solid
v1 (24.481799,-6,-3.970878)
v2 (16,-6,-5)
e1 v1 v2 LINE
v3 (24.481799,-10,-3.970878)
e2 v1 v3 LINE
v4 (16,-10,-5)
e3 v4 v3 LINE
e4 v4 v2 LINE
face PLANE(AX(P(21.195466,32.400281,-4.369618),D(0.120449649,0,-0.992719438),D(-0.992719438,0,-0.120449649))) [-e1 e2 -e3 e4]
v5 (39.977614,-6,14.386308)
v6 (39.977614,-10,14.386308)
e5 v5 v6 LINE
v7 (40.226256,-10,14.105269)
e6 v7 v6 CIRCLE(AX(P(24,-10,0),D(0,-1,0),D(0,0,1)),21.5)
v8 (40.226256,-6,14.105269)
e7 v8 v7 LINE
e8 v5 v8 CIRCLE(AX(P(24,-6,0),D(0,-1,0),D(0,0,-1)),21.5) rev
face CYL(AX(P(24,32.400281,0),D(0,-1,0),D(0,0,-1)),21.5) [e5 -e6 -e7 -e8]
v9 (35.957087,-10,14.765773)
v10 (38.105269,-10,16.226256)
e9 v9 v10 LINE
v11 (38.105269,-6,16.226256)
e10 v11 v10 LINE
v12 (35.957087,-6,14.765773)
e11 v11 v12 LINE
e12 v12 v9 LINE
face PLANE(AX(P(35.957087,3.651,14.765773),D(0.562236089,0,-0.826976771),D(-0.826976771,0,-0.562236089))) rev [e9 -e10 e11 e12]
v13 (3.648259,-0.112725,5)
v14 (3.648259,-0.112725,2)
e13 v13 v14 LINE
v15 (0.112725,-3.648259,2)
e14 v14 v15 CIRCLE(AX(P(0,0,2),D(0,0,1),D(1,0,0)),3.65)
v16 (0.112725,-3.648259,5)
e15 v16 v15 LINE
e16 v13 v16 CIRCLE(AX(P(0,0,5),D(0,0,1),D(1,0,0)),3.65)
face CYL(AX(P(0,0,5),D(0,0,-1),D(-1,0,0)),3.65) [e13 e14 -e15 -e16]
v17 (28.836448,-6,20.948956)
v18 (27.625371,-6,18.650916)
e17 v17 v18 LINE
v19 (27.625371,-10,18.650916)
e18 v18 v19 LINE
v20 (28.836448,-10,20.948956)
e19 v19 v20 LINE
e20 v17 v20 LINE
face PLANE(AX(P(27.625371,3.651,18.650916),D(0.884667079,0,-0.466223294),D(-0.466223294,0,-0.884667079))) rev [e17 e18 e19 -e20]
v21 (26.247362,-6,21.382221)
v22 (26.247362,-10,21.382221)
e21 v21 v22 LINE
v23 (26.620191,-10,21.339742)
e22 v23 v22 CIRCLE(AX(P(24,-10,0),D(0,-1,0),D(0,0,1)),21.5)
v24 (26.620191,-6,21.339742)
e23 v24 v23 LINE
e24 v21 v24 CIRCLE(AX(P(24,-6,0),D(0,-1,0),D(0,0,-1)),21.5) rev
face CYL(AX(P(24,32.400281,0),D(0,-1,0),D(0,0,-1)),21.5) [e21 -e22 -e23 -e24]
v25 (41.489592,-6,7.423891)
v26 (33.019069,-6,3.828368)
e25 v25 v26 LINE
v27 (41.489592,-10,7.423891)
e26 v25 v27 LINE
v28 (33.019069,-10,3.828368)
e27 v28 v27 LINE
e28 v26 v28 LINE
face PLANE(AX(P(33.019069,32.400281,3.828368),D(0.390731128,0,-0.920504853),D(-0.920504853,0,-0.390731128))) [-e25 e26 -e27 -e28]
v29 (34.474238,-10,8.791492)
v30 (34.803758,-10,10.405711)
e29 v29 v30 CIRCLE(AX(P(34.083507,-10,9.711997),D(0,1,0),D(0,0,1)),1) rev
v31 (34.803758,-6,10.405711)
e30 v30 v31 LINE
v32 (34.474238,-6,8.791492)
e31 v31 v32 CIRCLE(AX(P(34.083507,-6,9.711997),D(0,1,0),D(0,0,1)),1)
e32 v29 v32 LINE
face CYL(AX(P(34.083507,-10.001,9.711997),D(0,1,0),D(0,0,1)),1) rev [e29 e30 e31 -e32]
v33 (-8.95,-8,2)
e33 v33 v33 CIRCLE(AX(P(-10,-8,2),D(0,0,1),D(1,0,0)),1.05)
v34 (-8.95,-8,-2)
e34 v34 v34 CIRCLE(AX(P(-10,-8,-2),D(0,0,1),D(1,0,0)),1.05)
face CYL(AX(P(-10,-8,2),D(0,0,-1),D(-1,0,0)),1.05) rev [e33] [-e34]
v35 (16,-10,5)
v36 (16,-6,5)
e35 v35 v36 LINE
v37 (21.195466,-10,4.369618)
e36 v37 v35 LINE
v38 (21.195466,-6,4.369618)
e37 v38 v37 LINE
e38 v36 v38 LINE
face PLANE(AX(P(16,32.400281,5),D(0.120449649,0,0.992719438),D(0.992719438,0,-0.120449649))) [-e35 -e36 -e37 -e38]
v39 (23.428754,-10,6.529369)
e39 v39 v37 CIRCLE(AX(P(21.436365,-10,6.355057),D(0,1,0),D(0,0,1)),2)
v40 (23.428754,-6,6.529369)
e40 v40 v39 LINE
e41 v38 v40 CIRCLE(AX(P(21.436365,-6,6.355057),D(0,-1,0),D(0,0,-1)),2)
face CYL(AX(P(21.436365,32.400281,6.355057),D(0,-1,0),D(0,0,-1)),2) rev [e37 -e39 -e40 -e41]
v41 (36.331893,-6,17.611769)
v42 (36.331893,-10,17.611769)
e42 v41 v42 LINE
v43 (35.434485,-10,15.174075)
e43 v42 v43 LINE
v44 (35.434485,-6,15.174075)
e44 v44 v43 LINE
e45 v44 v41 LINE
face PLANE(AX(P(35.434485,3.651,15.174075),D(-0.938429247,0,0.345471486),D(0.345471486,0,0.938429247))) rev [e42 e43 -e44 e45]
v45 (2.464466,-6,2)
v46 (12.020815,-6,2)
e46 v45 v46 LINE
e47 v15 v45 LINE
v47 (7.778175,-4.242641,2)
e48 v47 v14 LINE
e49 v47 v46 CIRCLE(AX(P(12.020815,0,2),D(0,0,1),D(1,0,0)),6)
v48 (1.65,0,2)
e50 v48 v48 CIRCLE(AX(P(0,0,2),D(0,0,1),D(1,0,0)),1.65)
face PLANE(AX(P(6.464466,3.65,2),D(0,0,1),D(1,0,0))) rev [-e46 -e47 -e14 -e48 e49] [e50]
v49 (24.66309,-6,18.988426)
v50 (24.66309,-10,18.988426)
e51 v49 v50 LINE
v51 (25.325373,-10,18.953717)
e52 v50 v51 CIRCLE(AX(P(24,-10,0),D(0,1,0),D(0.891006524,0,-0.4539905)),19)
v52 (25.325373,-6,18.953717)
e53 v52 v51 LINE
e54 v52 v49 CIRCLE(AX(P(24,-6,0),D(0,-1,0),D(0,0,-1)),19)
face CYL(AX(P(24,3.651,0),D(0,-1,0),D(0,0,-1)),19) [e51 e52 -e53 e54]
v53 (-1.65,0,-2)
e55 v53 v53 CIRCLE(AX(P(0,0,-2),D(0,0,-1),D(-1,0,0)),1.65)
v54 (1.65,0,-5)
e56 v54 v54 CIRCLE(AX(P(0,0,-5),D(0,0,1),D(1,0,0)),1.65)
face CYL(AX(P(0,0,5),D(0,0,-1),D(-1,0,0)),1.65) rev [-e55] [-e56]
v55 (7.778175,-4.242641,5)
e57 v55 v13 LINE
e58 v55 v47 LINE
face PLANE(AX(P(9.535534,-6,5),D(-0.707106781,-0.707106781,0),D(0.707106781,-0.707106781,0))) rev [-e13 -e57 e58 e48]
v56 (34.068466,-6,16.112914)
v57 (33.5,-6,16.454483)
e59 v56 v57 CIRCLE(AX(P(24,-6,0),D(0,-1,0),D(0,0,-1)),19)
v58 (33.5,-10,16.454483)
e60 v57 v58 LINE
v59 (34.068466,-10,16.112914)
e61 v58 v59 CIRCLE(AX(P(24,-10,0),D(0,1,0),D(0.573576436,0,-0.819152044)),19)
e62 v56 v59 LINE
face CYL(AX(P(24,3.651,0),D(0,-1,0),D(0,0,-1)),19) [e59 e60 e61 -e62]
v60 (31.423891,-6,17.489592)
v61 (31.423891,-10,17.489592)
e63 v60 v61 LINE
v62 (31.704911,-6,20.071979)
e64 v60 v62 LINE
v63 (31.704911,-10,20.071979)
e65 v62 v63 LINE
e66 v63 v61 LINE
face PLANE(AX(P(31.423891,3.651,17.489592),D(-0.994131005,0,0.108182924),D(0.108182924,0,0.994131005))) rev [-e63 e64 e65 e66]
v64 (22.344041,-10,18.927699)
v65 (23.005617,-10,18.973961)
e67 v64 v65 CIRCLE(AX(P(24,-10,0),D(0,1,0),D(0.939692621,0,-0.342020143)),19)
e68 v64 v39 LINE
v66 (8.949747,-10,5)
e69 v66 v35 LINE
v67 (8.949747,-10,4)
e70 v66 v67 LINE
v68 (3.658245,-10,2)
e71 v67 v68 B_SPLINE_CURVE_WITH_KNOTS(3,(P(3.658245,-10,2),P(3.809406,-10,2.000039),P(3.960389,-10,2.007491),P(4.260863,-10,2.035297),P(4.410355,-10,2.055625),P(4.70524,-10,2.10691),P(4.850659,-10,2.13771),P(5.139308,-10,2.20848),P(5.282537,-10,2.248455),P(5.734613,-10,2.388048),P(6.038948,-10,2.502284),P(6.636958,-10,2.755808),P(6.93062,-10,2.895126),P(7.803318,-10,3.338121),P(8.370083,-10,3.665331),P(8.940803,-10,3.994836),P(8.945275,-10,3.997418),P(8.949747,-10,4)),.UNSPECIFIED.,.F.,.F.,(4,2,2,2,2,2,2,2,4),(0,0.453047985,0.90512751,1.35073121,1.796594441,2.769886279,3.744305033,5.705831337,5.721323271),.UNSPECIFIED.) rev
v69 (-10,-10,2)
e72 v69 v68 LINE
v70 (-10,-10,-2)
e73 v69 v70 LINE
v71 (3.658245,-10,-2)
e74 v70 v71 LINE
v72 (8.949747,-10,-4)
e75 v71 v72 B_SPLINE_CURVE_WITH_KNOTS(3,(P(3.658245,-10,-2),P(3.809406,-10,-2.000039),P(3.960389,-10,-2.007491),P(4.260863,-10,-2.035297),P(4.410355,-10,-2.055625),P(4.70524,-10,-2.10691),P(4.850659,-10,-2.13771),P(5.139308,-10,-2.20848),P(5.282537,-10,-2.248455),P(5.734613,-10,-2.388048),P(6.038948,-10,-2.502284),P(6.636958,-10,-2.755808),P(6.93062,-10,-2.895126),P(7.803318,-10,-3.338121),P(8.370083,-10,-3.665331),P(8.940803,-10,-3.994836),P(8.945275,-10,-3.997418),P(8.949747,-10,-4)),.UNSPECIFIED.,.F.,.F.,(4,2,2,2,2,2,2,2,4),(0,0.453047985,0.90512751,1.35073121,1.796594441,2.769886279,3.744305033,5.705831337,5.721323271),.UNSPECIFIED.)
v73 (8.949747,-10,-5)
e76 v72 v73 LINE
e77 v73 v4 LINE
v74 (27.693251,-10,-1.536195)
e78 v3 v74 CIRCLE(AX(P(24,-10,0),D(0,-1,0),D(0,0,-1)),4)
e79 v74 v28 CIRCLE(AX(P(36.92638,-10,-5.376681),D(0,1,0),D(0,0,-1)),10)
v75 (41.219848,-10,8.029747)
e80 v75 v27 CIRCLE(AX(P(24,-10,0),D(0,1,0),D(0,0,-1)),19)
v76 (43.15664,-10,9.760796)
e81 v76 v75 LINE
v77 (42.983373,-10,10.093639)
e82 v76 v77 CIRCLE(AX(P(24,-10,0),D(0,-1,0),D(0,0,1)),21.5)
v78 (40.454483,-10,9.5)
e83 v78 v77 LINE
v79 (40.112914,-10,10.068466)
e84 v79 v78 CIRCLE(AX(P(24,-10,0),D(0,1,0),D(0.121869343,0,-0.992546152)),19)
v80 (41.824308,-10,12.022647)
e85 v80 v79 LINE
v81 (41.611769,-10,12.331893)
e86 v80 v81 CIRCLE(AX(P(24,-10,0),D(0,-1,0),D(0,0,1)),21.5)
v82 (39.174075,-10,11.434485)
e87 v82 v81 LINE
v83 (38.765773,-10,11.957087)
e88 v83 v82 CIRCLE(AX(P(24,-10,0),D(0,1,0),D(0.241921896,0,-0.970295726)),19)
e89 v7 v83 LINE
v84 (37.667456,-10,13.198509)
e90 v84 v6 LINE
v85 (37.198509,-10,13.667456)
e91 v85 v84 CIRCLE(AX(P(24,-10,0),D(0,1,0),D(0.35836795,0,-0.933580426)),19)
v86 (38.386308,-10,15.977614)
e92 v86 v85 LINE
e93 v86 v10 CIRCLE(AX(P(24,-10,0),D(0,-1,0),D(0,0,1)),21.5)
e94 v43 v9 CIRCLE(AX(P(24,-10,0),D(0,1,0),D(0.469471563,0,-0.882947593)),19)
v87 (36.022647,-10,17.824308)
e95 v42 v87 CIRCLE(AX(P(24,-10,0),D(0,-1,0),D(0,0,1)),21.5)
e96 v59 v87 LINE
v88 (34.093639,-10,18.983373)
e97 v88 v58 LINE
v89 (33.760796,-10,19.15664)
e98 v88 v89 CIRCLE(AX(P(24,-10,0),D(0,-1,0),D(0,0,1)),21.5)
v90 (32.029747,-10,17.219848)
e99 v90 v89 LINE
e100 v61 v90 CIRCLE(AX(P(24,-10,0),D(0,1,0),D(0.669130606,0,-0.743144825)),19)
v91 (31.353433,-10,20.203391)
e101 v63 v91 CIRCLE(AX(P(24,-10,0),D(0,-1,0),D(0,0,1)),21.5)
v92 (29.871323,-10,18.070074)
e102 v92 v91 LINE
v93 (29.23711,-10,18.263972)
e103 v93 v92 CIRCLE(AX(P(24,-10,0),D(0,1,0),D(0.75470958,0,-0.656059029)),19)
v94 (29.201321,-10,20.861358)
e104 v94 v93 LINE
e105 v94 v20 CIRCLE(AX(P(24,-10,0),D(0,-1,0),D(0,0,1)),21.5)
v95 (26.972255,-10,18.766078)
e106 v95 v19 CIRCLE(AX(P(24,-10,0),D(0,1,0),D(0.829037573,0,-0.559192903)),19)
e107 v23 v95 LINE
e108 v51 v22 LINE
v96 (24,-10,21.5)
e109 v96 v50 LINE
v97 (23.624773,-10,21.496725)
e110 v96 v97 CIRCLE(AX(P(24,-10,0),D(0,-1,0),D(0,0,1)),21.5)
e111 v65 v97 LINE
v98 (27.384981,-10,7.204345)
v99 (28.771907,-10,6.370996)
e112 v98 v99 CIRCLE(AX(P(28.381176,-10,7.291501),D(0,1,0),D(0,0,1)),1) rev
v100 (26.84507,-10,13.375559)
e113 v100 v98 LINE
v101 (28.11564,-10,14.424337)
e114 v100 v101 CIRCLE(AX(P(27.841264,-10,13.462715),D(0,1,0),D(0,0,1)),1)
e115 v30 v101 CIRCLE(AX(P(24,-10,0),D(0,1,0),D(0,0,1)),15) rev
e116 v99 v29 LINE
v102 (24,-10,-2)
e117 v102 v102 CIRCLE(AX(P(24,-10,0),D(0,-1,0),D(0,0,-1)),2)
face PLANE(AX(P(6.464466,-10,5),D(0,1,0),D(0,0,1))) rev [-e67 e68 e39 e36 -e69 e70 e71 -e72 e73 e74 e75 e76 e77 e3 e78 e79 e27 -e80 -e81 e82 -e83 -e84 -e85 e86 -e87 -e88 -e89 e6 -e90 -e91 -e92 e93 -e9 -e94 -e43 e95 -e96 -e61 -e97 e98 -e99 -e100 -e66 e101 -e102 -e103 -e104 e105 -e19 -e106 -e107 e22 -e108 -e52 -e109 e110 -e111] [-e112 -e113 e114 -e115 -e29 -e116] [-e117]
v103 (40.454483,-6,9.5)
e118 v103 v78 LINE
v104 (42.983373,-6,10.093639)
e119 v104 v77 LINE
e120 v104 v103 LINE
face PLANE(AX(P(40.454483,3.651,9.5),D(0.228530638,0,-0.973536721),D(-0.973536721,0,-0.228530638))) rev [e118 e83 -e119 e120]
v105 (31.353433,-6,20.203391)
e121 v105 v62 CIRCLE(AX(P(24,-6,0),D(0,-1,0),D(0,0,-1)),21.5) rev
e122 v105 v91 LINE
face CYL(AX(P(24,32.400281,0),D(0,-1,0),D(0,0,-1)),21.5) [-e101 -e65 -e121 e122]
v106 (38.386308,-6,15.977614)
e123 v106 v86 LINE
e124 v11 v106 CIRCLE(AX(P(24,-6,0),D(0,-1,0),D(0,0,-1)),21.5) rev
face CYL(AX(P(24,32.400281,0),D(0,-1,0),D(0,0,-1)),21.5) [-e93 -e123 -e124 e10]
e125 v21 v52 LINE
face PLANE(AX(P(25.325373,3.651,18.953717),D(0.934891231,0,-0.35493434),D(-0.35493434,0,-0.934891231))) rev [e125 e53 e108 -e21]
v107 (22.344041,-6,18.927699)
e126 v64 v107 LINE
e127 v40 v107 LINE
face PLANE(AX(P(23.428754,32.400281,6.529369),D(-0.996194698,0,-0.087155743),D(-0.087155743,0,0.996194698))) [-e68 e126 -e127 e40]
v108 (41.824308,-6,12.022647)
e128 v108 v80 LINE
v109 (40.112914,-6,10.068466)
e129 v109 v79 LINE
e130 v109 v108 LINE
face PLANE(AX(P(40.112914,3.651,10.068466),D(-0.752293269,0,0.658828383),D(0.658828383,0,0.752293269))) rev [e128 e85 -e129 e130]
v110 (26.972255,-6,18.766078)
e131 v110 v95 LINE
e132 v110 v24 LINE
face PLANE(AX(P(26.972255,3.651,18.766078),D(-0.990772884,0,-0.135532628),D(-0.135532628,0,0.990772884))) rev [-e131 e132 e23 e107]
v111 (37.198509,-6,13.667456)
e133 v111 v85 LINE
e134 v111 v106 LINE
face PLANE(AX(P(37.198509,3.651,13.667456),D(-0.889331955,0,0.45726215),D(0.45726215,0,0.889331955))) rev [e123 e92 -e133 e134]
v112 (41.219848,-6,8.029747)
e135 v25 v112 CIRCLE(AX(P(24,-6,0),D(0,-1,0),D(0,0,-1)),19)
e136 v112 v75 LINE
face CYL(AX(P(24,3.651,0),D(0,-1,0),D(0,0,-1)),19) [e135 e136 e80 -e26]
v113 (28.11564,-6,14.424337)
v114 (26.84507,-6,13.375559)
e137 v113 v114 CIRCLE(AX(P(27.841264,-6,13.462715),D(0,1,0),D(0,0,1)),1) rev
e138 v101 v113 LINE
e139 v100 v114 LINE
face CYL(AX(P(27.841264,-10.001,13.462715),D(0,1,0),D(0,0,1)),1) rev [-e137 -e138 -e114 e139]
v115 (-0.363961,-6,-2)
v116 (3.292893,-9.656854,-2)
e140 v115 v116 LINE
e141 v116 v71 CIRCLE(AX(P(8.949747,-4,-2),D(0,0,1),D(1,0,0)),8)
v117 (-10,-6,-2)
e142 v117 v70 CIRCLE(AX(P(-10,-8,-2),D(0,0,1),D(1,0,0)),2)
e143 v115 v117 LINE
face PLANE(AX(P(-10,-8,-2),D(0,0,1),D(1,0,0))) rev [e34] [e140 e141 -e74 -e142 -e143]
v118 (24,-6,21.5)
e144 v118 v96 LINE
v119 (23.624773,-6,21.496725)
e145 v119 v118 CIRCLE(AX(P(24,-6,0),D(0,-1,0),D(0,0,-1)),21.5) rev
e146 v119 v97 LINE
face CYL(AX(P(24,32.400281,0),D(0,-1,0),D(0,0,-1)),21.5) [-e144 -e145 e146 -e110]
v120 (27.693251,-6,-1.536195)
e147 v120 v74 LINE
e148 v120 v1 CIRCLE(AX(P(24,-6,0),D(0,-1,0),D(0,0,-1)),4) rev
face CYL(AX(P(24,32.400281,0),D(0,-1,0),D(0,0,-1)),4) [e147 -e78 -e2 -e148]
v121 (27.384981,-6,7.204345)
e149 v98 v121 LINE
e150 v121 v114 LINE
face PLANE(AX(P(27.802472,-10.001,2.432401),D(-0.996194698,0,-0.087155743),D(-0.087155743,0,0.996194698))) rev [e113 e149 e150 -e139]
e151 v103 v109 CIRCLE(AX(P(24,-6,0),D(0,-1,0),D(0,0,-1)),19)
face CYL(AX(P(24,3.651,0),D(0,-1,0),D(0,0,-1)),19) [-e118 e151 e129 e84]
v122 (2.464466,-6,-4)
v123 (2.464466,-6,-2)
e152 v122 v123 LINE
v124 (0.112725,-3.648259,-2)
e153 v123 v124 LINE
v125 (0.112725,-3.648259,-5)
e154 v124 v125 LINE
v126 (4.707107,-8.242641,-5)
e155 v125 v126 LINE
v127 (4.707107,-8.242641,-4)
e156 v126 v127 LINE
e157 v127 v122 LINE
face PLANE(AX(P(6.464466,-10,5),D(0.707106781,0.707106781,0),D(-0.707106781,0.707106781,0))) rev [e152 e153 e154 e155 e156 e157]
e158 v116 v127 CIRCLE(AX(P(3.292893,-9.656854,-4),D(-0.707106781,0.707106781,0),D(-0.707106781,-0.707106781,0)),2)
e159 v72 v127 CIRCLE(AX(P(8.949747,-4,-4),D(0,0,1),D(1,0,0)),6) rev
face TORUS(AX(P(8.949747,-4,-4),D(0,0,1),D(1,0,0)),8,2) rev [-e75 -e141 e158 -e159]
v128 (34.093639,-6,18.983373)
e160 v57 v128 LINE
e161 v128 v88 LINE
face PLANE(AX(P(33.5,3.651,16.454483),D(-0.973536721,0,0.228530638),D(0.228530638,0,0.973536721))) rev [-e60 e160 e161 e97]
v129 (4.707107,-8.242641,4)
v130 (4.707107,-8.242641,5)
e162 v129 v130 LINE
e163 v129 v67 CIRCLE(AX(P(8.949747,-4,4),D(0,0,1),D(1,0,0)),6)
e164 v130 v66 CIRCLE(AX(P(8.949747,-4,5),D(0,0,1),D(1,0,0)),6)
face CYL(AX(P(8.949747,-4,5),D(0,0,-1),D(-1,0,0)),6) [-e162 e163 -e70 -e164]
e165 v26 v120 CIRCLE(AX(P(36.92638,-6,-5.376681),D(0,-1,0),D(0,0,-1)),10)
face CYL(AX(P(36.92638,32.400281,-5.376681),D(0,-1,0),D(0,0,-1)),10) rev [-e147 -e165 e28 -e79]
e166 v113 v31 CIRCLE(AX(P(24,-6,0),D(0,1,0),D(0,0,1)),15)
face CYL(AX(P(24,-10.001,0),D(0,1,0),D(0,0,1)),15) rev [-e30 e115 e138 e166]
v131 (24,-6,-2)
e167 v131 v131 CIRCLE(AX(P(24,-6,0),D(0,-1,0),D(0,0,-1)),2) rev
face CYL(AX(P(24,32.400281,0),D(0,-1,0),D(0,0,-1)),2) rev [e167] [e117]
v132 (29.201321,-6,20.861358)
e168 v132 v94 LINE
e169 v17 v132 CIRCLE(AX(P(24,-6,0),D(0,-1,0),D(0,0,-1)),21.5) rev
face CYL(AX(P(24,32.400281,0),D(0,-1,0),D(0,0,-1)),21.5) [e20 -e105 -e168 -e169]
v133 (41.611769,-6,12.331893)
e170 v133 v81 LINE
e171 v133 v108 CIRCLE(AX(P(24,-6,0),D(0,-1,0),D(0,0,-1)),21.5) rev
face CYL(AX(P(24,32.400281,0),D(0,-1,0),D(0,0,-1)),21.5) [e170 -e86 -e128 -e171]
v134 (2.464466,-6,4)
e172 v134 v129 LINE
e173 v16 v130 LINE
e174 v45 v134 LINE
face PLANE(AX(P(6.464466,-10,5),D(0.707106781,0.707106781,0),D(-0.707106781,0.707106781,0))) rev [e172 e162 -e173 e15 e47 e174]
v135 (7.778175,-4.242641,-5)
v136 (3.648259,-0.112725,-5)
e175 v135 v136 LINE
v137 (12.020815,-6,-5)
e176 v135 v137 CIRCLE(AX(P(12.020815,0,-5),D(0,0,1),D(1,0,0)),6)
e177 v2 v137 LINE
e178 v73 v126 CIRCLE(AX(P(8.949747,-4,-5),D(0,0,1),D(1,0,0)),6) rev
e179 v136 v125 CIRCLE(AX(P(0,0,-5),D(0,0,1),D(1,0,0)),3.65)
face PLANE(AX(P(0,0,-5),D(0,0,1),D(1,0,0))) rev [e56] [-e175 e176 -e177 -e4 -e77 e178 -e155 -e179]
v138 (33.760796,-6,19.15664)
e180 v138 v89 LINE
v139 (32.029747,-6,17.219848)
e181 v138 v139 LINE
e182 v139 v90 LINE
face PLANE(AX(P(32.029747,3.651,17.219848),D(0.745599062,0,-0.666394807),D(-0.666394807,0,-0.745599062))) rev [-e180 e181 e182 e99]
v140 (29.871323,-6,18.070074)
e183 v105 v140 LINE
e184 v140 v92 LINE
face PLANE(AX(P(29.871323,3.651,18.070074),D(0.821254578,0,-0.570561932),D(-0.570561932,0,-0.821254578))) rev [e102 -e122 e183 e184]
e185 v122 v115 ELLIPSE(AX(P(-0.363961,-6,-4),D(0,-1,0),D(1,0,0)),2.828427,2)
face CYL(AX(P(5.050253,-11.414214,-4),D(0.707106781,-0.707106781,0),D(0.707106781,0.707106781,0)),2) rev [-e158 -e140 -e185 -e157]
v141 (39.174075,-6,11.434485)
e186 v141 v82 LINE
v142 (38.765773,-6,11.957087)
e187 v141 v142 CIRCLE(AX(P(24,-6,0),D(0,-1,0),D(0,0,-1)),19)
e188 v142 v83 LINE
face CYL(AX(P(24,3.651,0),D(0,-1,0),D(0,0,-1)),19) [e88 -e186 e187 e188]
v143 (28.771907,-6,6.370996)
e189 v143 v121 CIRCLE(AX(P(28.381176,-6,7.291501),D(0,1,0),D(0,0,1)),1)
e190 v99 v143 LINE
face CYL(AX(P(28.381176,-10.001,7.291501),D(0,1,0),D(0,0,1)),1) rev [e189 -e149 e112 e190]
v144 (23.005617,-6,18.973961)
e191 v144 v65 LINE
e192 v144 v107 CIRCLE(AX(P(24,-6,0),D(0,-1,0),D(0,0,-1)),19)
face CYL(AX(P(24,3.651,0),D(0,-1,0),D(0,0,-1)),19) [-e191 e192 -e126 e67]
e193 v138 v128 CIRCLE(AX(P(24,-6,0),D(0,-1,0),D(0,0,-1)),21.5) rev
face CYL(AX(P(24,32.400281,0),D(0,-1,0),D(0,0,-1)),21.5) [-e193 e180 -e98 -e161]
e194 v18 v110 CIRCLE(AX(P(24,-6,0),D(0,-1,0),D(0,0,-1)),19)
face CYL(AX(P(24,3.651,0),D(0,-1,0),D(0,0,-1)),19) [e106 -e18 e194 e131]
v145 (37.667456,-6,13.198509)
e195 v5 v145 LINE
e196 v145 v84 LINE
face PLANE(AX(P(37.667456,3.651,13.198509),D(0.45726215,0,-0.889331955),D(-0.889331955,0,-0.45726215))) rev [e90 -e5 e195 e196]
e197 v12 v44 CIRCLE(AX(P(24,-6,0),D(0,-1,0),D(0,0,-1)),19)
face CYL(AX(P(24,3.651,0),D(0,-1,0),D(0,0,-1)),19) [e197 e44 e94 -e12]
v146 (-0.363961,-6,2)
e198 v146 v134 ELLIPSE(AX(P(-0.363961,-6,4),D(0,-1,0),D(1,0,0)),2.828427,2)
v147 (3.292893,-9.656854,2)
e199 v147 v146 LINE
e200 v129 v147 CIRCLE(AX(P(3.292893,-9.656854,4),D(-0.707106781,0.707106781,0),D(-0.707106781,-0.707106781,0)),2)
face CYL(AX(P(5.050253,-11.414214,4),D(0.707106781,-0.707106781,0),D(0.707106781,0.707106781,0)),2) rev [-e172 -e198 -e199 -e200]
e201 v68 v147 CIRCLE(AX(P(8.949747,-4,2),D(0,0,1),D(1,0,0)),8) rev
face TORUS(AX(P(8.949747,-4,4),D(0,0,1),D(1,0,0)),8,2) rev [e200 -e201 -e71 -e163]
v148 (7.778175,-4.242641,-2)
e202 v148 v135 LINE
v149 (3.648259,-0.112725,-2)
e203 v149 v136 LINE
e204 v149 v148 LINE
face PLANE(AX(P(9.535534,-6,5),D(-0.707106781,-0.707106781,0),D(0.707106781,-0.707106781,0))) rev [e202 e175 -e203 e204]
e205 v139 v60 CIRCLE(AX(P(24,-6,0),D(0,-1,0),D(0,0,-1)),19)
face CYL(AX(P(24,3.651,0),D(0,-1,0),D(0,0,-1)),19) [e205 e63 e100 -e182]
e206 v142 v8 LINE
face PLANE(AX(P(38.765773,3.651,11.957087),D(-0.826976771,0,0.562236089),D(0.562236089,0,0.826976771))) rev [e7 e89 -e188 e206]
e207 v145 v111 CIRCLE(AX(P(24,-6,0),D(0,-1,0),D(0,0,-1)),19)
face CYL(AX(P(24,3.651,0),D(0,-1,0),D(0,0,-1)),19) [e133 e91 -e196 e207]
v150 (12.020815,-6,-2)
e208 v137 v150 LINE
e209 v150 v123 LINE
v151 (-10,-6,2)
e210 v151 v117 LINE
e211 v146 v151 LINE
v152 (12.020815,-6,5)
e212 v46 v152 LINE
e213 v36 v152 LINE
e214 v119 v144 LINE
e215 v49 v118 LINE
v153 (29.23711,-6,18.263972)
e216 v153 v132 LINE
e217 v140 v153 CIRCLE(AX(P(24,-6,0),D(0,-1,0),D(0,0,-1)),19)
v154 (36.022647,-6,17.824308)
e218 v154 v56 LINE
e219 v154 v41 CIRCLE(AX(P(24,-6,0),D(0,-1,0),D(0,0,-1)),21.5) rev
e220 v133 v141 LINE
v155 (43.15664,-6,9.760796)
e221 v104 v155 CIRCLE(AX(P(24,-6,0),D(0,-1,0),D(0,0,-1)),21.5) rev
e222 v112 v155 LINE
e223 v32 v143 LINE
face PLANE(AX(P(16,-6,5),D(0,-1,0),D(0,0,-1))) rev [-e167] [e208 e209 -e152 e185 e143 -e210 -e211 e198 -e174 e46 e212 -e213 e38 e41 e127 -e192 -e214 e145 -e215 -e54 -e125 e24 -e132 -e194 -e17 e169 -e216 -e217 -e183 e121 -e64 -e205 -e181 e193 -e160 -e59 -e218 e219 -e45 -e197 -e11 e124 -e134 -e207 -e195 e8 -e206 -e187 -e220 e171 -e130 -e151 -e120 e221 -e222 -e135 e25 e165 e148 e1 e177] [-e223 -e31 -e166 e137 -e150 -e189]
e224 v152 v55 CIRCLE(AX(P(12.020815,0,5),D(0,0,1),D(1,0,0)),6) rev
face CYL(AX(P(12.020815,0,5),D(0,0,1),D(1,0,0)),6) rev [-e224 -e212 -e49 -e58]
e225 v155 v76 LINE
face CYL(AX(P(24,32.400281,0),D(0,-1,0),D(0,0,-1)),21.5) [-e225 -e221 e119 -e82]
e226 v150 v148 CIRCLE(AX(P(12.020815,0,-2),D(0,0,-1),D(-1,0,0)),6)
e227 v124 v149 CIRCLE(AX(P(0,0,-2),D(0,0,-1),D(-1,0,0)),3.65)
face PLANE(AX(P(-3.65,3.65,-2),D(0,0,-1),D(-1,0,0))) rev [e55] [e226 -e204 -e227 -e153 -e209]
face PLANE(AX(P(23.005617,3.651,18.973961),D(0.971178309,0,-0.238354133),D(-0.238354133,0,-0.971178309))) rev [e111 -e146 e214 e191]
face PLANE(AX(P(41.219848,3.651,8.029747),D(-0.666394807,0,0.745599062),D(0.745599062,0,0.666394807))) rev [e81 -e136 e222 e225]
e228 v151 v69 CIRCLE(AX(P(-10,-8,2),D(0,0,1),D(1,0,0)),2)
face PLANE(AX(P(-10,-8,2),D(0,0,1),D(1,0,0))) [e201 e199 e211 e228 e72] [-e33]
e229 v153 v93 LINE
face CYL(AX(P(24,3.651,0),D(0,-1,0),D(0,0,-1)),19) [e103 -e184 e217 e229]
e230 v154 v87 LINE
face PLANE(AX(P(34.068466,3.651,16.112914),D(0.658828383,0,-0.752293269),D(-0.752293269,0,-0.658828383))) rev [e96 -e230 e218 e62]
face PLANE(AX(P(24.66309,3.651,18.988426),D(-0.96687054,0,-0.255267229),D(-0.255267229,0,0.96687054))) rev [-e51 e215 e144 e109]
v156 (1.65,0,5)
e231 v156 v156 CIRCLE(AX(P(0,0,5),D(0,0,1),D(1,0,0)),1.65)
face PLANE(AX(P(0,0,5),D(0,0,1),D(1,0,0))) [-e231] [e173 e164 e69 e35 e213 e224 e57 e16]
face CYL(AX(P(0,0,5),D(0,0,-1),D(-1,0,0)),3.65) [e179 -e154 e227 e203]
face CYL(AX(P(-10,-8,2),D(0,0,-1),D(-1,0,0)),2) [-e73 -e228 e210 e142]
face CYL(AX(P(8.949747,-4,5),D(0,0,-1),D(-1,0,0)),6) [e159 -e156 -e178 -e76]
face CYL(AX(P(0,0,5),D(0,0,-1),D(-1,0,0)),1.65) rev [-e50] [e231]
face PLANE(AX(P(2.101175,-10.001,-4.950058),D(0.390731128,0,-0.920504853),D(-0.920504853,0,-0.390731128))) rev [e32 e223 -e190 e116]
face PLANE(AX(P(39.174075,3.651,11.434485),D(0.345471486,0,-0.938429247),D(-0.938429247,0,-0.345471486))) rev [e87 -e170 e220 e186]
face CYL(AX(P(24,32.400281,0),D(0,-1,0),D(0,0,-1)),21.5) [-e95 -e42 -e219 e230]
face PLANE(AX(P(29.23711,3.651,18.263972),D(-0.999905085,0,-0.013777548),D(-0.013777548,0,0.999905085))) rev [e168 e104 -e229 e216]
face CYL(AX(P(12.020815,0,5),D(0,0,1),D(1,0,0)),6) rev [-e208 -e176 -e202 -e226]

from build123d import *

# Parameters (mm, degrees)
SKETCH1_R           = 1.6500000000000001
BOSS_EXTRUDE1_DEPTH = 5
CUT_EXTRUDE1_DEPTH  = 22.617643257302586
SKETCH4_R           = 2.000000000000003
BOSS_EXTRUDE2_DEPTH = 4
SKETCH5_R           = 1.0500000000000005
BOSS_EXTRUDE3_DEPTH = 2
CUT_EXTRUDE2_REACH  = 52.658
CIRPATTERN1_COUNT   = 11
CIRPATTERN1_ANGLE   = 70.00000000000016
CUT_EXTRUDE3_DEPTH  = 4
FILLET1_R           = 6
FILLET2_R           = 2
CUT_EXTRUDE4_REACH  = 51.172


with BuildPart() as part:
    # Sketch1 → Boss-Extrude1 (new, symmetric)
    with BuildSketch(Plane.XY):
        with BuildLine():
            Line((6.464466094067297, -10), (16, -10))
            Line((16, -10), (16, -5.999999999999998))
            Line((16, -5.999999999999998), (9.535533905932775, -5.999999999999998))
            Line((9.535533905932775, -5.999999999999998), (3.6482589098755183, -0.11272500394276944))
            ThreePointArc((3.6482589098755183, -0.11272500394276944), (-2.580939751330903, 2.5809397513308943), (0.11272500394278592, -3.6482589098755174))
            Line((0.11272500394278592, -3.6482589098755174), (6.464466094067297, -10))
        make_face()
        Circle(SKETCH1_R, mode=Mode.SUBTRACT)
    extrude(amount=BOSS_EXTRUDE1_DEPTH, both=True)

    # Sketch3 → Cut-Extrude1 (cut, through all)
    with BuildSketch(Plane.XZ.offset(10)):
        Polygon((6.464466094067297, 2.000000000000001), (-3.6500000000000012, 1.9999999999999996), (-3.650000000000001, -2.0000000000000004), (6.464466094067298, -1.9999999999999991), align=None)
    extrude(amount=-CUT_EXTRUDE1_DEPTH, mode=Mode.SUBTRACT)

    # Sketch4 → Boss-Extrude2 (add)
    with BuildSketch(Plane.XZ.offset(10)):
        with BuildLine():
            Line((16, 5), (16, -5))
            Line((16, -5), (21.19546555409763, -4.369618467658506))
            Line((21.19546555409763, -4.369618467658506), (24.481798594453377, -3.970877751125406))
            ThreePointArc((24.481798594453377, -3.970877751125406), (26.41654324887739, -3.187525486377344), (27.693251449070946, -1.5361945625263))
            ThreePointArc((27.693251449070946, -1.5361945625263), (29.829731429750588, 1.668713133124987), (33.01906878685553, 3.8283675656823353))
            Line((33.01906878685553, 3.8283675656823353), (43.79085434922743, 8.400719262519475))
            ThreePointArc((43.79085434922743, 8.400719262519475), (35.07331861056618, 18.429096965095408), (22.126151530925494, 21.418186008972544))
            Line((22.126151530925494, 21.418186008972544), (23.428754247507808, 6.529368828716514))
            ThreePointArc((23.428754247507808, 6.529368828716514), (22.82671005925236, 4.917371632507108), (21.19546555409763, 4.369618467658506))
            Line((21.19546555409763, 4.369618467658506), (16, 5))
        make_face()
        with Locations(Location((24, 0, 0), (0, 0, 270))):
            Circle(SKETCH4_R, mode=Mode.SUBTRACT)
    extrude(amount=-BOSS_EXTRUDE2_DEPTH)

    # Sketch5 → Boss-Extrude3 (add, symmetric)
    with BuildSketch(Plane.XY):
        with BuildLine():
            Line((6.464466094067297, -10), (-10, -10.000000000000002))
            ThreePointArc((-10, -10.000000000000002), (-11.999999999999998, -8), (-9.999999999999998, -6.000000000000002))
            Line((-9.999999999999998, -6.000000000000002), (9.535533905932775, -5.999999999999998))
            Line((9.535533905932775, -5.999999999999998), (16, -5.999999999999998))
            Line((16, -5.999999999999998), (16, -10))
            Line((16, -10), (6.464466094067297, -10))
        make_face()
        with Locations((-9.999999999999998, -8.000000000000002)):
            Circle(SKETCH5_R, mode=Mode.SUBTRACT)
    extrude(amount=BOSS_EXTRUDE3_DEPTH, both=True)

    # Sketch6 → Cut-Extrude2 (cut, up to next)
    with BuildSketch(Plane.XZ.offset(10), mode=Mode.PRIVATE) as cut_extrude2_sk1:
        with BuildLine():
            Line((41.21984795369632, 8.029746973073365), (43.15664027004987, 9.760795744400328))
            ThreePointArc((43.15664027004987, 9.760795744400328), (43.324071995432064, 9.424979655965245), (43.48561742128794, 9.086292627425122))
            ThreePointArc((43.48561742128794, 9.086292627425122), (43.64122733931588, 8.744837826129787), (43.79085434922743, 8.40071926251947))
            ThreePointArc((43.79085434922743, 8.40071926251947), (43.93445287318589, 8.054041758442194), (44.071979169689804, 7.704910915224042))
            Line((44.071979169689804, 7.704910915224042), (41.48959221559633, 7.42389144129628))
            ThreePointArc((41.48959221559633, 7.42389144129628), (41.357363695209386, 7.72799621844028), (41.21984795369632, 8.029746973073365))
        make_face()
    cut_extrude2_tool1 = extrude(cut_extrude2_sk1.sketch, amount=-CUT_EXTRUDE2_REACH, mode=Mode.PRIVATE) & part.part
    cut_extrude2 = cut_extrude2_tool1.solids().sort_by_distance((42.701484, -10, 8.326437))[0]
    add(cut_extrude2, mode=Mode.SUBTRACT)

    # CirPattern1: Cut-Extrude2; each copy of Cut-Extrude2 runs up to whatever stops it at its own place
    cirpattern1_before = part.part  # the part as the pattern finds it: every copy runs up to it
    cirpattern1_cut_extrude2_long = extrude(cut_extrude2_sk1.sketch, amount=-CUT_EXTRUDE2_REACH, mode=Mode.PRIVATE)
    cirpattern1_cut_extrude2_tool1 = cirpattern1_cut_extrude2_long.rotate(Axis((24.000000000000014, 0, -2.52e-15), (0, -1, 0)), 1 * CIRPATTERN1_ANGLE / (CIRPATTERN1_COUNT - 1)) & cirpattern1_before
    add(cirpattern1_cut_extrude2_tool1.solids().sort_by_distance((41.547349, -10, 10.543511))[0], mode=Mode.SUBTRACT)
    cirpattern1_cut_extrude2_tool2 = cirpattern1_cut_extrude2_long.rotate(Axis((24.000000000000014, 0, -2.52e-15), (0, -1, 0)), 2 * CIRPATTERN1_ANGLE / (CIRPATTERN1_COUNT - 1)) & cirpattern1_before
    add(cirpattern1_cut_extrude2_tool2.solids().sort_by_distance((40.131623, -10, 12.603405))[0], mode=Mode.SUBTRACT)
    cirpattern1_cut_extrude2_tool3 = cirpattern1_cut_extrude2_long.rotate(Axis((24.000000000000014, 0, -2.52e-15), (0, -1, 0)), 3 * CIRPATTERN1_ANGLE / (CIRPATTERN1_COUNT - 1)) & cirpattern1_before
    add(cirpattern1_cut_extrude2_tool3.solids().sort_by_distance((38.475411, -10, 14.475411))[0], mode=Mode.SUBTRACT)
    cirpattern1_cut_extrude2_tool4 = cirpattern1_cut_extrude2_long.rotate(Axis((24.000000000000014, 0, -2.52e-15), (0, -1, 0)), 4 * CIRPATTERN1_ANGLE / (CIRPATTERN1_COUNT - 1)) & cirpattern1_before
    add(cirpattern1_cut_extrude2_tool4.solids().sort_by_distance((36.603405, -10, 16.131622))[0], mode=Mode.SUBTRACT)
    cirpattern1_cut_extrude2_tool5 = cirpattern1_cut_extrude2_long.rotate(Axis((24.000000000000014, 0, -2.52e-15), (0, -1, 0)), 5 * CIRPATTERN1_ANGLE / (CIRPATTERN1_COUNT - 1)) & cirpattern1_before
    add(cirpattern1_cut_extrude2_tool5.solids().sort_by_distance((34.543511, -10, 17.547348))[0], mode=Mode.SUBTRACT)
    cirpattern1_cut_extrude2_tool6 = cirpattern1_cut_extrude2_long.rotate(Axis((24.000000000000014, 0, -2.52e-15), (0, -1, 0)), 6 * CIRPATTERN1_ANGLE / (CIRPATTERN1_COUNT - 1)) & cirpattern1_before
    add(cirpattern1_cut_extrude2_tool6.solids().sort_by_distance((32.326437, -10, 18.701484))[0], mode=Mode.SUBTRACT)
    cirpattern1_cut_extrude2_tool7 = cirpattern1_cut_extrude2_long.rotate(Axis((24.000000000000014, 0, -2.52e-15), (0, -1, 0)), 7 * CIRPATTERN1_ANGLE / (CIRPATTERN1_COUNT - 1)) & cirpattern1_before
    add(cirpattern1_cut_extrude2_tool7.solids().sort_by_distance((29.985236, -10, 19.576823))[0], mode=Mode.SUBTRACT)
    cirpattern1_cut_extrude2_tool8 = cirpattern1_cut_extrude2_long.rotate(Axis((24.000000000000014, 0, -2.52e-15), (0, -1, 0)), 8 * CIRPATTERN1_ANGLE / (CIRPATTERN1_COUNT - 1)) & cirpattern1_before
    add(cirpattern1_cut_extrude2_tool8.solids().sort_by_distance((27.554808, -10, 20.160317))[0], mode=Mode.SUBTRACT)
    cirpattern1_cut_extrude2_tool9 = cirpattern1_cut_extrude2_long.rotate(Axis((24.000000000000014, 0, -2.52e-15), (0, -1, 0)), 9 * CIRPATTERN1_ANGLE / (CIRPATTERN1_COUNT - 1)) & cirpattern1_before
    add(cirpattern1_cut_extrude2_tool9.solids().sort_by_distance((25.071386, -10, 20.443268))[0], mode=Mode.SUBTRACT)
    cirpattern1_cut_extrude2_tool10 = cirpattern1_cut_extrude2_long.rotate(Axis((24.000000000000014, 0, -2.52e-15), (0, -1, 0)), 10 * CIRPATTERN1_ANGLE / (CIRPATTERN1_COUNT - 1)) & cirpattern1_before
    add(cirpattern1_cut_extrude2_tool10.solids().sort_by_distance((22.571993, -10, 20.421456))[0], mode=Mode.SUBTRACT)

    # Sketch7 → Cut-Extrude3 (cut)
    with BuildSketch(Plane(origin=(0, -5.999999999999998, 0), x_dir=(1, 0, 0), z_dir=(0, 1, 0))):
        Polygon((9.535533905932775, -2.0000000000000013), (6.464466094067297, -2.000000000000001), (6.464466094067298, 1.9999999999999991), (9.535533905932775, 1.9999999999999991), align=None)
    extrude(amount=CUT_EXTRUDE3_DEPTH, mode=Mode.SUBTRACT)

    # Fillet1
    fillet1_edges = [part.edges().sort_by_distance(p)[0] for p in [
        (6.464466094067297, -10, 3.5),
        (9.535533905932775, -5.999999999999998, 3.5),
        (6.464466094067297, -10, -3.4999999999999996),
        (9.535533905932775, -5.999999999999998, -3.5),
    ]]
    fillet(fillet1_edges, radius=FILLET1_R)

    # Fillet2
    # the kernel refuses this fillet: 2 mm, written as the material it adds along each edge
    with BuildSketch(Plane(origin=(-1.0710678118654662, -2.4644660940672707, -2), x_dir=(1.2e-16, -1e-17, -1), z_dir=(0.7071067811865491, -0.707106781186546, 0))) as fillet2_piece_1_section:
        with BuildLine():
            CenterArc((FILLET2_R, -FILLET2_R), FILLET2_R, 90, 90)
            Line((-1.6e-16, -FILLET2_R), (0, 0))
            Line((0, 0), (FILLET2_R, 0))
        make_face()
    fillet2_piece_1 = extrude(amount=8.171572875253831, mode=Mode.PRIVATE)
    fillet2_piece_1 = split(fillet2_piece_1, bisect_by=Plane(origin=(3.0707262538263027, -5.999999999999999, -2.423870706471317), z_dir=(1.8e-16, -1, 0)), keep=Keep.TOP, mode=Mode.PRIVATE)
    add(fillet2_piece_1)
    with BuildSketch(Plane(origin=(8.94974746830586, -3.999999999999999, -2), x_dir=(-0.7071067811865458, -0.7071067811865492, 0), z_dir=(-0.7071067811865492, 0.7071067811865458, 0))) as fillet2_piece_2_section:
        with BuildLine():
            CenterArc((6 + FILLET2_R, -FILLET2_R), FILLET2_R, 90, 90)
            Line((6 + FILLET2_R, 0), (6, 0))
            Line((6, 0), (6.000000000000001, -FILLET2_R))
        make_face()
    fillet2_piece_2 = revolve(axis=Axis((8.94974746830586, -3.999999999999999, -2), (0, 0, 1)), revolution_arc=92.75127695444853, mode=Mode.PRIVATE)
    fillet2_piece_2 = split(fillet2_piece_2, bisect_by=Plane(origin=(6.6265116676217675, -10, -2.6906159544544805), z_dir=(0, 1, 0)), keep=Keep.TOP, mode=Mode.PRIVATE)
    add(fillet2_piece_2)
    with BuildSketch(Plane(origin=(8.94974746830586, -3.999999999999999, 2), x_dir=(-0.7071067811865458, -0.7071067811865492, 0), z_dir=(-0.7071067811865492, 0.7071067811865458, 0))) as fillet2_piece_3_section:
        with BuildLine():
            CenterArc((6 + FILLET2_R, FILLET2_R), FILLET2_R, 180, 90)
            Line((6 + FILLET2_R, 0), (6, 0))
            Line((6, 0), (6.000000000000001, FILLET2_R))
        make_face()
    fillet2_piece_3 = revolve(axis=Axis((8.94974746830586, -3.999999999999999, 2), (0, 0, 1)), revolution_arc=92.75127695444853, mode=Mode.PRIVATE)
    fillet2_piece_3 = split(fillet2_piece_3, bisect_by=Plane(origin=(6.626511667621772, -10, 2.6906159544544797), z_dir=(0, 1, 0)), keep=Keep.TOP, mode=Mode.PRIVATE)
    add(fillet2_piece_3)
    with BuildSketch(Plane(origin=(4.707106781186583, -8.242640687119295, 2.0000000000000004), x_dir=(1.6e-16, 2.9e-16, 1), z_dir=(-0.7071067811865491, 0.707106781186546, 0))) as fillet2_piece_4_section:
        with BuildLine():
            CenterArc((FILLET2_R, -FILLET2_R), FILLET2_R, 89.99999999999999, 90.00000000000001)
            Line((-1.07e-15, -FILLET2_R), (0, 0))
            Line((0, 0), (FILLET2_R, 0))
        make_face()
    fillet2_piece_4 = extrude(amount=8.171572875253833, mode=Mode.PRIVATE)
    fillet2_piece_4 = split(fillet2_piece_4, bisect_by=Plane(origin=(3.0707262538259545, -5.999999999999999, 2.4238707064714085), z_dir=(1.8e-16, -1, 0)), keep=Keep.TOP, mode=Mode.PRIVATE)
    add(fillet2_piece_4)

    # Sketch8 → Cut-Extrude4 (cut, up to next)
    with BuildSketch(Plane(origin=(0, -5.999999999999998, 0), x_dir=(1, 0, 0), z_dir=(0, 1, 0)), mode=Mode.PRIVATE) as cut_extrude4_sk1:
        with BuildLine():
            ThreePointArc((28.115640284464295, -14.42433724816827), (31.725571123650823, -12.857509510531676), (34.803757775643525, -10.405710832289252))
            ThreePointArc((34.803757775643525, -10.405710832289252), (35.06330097352167, -9.511986093117567), (34.47423838575658, -8.791491923350865))
            Line((34.47423838575658, -8.791491923350865), (28.771906676032494, -6.370995718899502))
            ThreePointArc((28.771906676032494, -6.370995718899502), (27.866137472633152, -6.434333271649826), (27.38498084945146, -7.2043448296042945))
            Line((27.38498084945146, -7.2043448296042945), (26.845069567408263, -13.375559022209401))
            ThreePointArc((26.845069567408263, -13.375559022209401), (27.20468002661588, -14.23392193997834), (28.115640284464295, -14.42433724816827))
        make_face()
    cut_extrude4_tool1 = extrude(cut_extrude4_sk1.sketch, amount=-CUT_EXTRUDE4_REACH, mode=Mode.PRIVATE) & part.part
    add(cut_extrude4_tool1.solids().sort_by_distance((30.212176, -6, 10.338796))[0], mode=Mode.SUBTRACT)


solid = part.part
